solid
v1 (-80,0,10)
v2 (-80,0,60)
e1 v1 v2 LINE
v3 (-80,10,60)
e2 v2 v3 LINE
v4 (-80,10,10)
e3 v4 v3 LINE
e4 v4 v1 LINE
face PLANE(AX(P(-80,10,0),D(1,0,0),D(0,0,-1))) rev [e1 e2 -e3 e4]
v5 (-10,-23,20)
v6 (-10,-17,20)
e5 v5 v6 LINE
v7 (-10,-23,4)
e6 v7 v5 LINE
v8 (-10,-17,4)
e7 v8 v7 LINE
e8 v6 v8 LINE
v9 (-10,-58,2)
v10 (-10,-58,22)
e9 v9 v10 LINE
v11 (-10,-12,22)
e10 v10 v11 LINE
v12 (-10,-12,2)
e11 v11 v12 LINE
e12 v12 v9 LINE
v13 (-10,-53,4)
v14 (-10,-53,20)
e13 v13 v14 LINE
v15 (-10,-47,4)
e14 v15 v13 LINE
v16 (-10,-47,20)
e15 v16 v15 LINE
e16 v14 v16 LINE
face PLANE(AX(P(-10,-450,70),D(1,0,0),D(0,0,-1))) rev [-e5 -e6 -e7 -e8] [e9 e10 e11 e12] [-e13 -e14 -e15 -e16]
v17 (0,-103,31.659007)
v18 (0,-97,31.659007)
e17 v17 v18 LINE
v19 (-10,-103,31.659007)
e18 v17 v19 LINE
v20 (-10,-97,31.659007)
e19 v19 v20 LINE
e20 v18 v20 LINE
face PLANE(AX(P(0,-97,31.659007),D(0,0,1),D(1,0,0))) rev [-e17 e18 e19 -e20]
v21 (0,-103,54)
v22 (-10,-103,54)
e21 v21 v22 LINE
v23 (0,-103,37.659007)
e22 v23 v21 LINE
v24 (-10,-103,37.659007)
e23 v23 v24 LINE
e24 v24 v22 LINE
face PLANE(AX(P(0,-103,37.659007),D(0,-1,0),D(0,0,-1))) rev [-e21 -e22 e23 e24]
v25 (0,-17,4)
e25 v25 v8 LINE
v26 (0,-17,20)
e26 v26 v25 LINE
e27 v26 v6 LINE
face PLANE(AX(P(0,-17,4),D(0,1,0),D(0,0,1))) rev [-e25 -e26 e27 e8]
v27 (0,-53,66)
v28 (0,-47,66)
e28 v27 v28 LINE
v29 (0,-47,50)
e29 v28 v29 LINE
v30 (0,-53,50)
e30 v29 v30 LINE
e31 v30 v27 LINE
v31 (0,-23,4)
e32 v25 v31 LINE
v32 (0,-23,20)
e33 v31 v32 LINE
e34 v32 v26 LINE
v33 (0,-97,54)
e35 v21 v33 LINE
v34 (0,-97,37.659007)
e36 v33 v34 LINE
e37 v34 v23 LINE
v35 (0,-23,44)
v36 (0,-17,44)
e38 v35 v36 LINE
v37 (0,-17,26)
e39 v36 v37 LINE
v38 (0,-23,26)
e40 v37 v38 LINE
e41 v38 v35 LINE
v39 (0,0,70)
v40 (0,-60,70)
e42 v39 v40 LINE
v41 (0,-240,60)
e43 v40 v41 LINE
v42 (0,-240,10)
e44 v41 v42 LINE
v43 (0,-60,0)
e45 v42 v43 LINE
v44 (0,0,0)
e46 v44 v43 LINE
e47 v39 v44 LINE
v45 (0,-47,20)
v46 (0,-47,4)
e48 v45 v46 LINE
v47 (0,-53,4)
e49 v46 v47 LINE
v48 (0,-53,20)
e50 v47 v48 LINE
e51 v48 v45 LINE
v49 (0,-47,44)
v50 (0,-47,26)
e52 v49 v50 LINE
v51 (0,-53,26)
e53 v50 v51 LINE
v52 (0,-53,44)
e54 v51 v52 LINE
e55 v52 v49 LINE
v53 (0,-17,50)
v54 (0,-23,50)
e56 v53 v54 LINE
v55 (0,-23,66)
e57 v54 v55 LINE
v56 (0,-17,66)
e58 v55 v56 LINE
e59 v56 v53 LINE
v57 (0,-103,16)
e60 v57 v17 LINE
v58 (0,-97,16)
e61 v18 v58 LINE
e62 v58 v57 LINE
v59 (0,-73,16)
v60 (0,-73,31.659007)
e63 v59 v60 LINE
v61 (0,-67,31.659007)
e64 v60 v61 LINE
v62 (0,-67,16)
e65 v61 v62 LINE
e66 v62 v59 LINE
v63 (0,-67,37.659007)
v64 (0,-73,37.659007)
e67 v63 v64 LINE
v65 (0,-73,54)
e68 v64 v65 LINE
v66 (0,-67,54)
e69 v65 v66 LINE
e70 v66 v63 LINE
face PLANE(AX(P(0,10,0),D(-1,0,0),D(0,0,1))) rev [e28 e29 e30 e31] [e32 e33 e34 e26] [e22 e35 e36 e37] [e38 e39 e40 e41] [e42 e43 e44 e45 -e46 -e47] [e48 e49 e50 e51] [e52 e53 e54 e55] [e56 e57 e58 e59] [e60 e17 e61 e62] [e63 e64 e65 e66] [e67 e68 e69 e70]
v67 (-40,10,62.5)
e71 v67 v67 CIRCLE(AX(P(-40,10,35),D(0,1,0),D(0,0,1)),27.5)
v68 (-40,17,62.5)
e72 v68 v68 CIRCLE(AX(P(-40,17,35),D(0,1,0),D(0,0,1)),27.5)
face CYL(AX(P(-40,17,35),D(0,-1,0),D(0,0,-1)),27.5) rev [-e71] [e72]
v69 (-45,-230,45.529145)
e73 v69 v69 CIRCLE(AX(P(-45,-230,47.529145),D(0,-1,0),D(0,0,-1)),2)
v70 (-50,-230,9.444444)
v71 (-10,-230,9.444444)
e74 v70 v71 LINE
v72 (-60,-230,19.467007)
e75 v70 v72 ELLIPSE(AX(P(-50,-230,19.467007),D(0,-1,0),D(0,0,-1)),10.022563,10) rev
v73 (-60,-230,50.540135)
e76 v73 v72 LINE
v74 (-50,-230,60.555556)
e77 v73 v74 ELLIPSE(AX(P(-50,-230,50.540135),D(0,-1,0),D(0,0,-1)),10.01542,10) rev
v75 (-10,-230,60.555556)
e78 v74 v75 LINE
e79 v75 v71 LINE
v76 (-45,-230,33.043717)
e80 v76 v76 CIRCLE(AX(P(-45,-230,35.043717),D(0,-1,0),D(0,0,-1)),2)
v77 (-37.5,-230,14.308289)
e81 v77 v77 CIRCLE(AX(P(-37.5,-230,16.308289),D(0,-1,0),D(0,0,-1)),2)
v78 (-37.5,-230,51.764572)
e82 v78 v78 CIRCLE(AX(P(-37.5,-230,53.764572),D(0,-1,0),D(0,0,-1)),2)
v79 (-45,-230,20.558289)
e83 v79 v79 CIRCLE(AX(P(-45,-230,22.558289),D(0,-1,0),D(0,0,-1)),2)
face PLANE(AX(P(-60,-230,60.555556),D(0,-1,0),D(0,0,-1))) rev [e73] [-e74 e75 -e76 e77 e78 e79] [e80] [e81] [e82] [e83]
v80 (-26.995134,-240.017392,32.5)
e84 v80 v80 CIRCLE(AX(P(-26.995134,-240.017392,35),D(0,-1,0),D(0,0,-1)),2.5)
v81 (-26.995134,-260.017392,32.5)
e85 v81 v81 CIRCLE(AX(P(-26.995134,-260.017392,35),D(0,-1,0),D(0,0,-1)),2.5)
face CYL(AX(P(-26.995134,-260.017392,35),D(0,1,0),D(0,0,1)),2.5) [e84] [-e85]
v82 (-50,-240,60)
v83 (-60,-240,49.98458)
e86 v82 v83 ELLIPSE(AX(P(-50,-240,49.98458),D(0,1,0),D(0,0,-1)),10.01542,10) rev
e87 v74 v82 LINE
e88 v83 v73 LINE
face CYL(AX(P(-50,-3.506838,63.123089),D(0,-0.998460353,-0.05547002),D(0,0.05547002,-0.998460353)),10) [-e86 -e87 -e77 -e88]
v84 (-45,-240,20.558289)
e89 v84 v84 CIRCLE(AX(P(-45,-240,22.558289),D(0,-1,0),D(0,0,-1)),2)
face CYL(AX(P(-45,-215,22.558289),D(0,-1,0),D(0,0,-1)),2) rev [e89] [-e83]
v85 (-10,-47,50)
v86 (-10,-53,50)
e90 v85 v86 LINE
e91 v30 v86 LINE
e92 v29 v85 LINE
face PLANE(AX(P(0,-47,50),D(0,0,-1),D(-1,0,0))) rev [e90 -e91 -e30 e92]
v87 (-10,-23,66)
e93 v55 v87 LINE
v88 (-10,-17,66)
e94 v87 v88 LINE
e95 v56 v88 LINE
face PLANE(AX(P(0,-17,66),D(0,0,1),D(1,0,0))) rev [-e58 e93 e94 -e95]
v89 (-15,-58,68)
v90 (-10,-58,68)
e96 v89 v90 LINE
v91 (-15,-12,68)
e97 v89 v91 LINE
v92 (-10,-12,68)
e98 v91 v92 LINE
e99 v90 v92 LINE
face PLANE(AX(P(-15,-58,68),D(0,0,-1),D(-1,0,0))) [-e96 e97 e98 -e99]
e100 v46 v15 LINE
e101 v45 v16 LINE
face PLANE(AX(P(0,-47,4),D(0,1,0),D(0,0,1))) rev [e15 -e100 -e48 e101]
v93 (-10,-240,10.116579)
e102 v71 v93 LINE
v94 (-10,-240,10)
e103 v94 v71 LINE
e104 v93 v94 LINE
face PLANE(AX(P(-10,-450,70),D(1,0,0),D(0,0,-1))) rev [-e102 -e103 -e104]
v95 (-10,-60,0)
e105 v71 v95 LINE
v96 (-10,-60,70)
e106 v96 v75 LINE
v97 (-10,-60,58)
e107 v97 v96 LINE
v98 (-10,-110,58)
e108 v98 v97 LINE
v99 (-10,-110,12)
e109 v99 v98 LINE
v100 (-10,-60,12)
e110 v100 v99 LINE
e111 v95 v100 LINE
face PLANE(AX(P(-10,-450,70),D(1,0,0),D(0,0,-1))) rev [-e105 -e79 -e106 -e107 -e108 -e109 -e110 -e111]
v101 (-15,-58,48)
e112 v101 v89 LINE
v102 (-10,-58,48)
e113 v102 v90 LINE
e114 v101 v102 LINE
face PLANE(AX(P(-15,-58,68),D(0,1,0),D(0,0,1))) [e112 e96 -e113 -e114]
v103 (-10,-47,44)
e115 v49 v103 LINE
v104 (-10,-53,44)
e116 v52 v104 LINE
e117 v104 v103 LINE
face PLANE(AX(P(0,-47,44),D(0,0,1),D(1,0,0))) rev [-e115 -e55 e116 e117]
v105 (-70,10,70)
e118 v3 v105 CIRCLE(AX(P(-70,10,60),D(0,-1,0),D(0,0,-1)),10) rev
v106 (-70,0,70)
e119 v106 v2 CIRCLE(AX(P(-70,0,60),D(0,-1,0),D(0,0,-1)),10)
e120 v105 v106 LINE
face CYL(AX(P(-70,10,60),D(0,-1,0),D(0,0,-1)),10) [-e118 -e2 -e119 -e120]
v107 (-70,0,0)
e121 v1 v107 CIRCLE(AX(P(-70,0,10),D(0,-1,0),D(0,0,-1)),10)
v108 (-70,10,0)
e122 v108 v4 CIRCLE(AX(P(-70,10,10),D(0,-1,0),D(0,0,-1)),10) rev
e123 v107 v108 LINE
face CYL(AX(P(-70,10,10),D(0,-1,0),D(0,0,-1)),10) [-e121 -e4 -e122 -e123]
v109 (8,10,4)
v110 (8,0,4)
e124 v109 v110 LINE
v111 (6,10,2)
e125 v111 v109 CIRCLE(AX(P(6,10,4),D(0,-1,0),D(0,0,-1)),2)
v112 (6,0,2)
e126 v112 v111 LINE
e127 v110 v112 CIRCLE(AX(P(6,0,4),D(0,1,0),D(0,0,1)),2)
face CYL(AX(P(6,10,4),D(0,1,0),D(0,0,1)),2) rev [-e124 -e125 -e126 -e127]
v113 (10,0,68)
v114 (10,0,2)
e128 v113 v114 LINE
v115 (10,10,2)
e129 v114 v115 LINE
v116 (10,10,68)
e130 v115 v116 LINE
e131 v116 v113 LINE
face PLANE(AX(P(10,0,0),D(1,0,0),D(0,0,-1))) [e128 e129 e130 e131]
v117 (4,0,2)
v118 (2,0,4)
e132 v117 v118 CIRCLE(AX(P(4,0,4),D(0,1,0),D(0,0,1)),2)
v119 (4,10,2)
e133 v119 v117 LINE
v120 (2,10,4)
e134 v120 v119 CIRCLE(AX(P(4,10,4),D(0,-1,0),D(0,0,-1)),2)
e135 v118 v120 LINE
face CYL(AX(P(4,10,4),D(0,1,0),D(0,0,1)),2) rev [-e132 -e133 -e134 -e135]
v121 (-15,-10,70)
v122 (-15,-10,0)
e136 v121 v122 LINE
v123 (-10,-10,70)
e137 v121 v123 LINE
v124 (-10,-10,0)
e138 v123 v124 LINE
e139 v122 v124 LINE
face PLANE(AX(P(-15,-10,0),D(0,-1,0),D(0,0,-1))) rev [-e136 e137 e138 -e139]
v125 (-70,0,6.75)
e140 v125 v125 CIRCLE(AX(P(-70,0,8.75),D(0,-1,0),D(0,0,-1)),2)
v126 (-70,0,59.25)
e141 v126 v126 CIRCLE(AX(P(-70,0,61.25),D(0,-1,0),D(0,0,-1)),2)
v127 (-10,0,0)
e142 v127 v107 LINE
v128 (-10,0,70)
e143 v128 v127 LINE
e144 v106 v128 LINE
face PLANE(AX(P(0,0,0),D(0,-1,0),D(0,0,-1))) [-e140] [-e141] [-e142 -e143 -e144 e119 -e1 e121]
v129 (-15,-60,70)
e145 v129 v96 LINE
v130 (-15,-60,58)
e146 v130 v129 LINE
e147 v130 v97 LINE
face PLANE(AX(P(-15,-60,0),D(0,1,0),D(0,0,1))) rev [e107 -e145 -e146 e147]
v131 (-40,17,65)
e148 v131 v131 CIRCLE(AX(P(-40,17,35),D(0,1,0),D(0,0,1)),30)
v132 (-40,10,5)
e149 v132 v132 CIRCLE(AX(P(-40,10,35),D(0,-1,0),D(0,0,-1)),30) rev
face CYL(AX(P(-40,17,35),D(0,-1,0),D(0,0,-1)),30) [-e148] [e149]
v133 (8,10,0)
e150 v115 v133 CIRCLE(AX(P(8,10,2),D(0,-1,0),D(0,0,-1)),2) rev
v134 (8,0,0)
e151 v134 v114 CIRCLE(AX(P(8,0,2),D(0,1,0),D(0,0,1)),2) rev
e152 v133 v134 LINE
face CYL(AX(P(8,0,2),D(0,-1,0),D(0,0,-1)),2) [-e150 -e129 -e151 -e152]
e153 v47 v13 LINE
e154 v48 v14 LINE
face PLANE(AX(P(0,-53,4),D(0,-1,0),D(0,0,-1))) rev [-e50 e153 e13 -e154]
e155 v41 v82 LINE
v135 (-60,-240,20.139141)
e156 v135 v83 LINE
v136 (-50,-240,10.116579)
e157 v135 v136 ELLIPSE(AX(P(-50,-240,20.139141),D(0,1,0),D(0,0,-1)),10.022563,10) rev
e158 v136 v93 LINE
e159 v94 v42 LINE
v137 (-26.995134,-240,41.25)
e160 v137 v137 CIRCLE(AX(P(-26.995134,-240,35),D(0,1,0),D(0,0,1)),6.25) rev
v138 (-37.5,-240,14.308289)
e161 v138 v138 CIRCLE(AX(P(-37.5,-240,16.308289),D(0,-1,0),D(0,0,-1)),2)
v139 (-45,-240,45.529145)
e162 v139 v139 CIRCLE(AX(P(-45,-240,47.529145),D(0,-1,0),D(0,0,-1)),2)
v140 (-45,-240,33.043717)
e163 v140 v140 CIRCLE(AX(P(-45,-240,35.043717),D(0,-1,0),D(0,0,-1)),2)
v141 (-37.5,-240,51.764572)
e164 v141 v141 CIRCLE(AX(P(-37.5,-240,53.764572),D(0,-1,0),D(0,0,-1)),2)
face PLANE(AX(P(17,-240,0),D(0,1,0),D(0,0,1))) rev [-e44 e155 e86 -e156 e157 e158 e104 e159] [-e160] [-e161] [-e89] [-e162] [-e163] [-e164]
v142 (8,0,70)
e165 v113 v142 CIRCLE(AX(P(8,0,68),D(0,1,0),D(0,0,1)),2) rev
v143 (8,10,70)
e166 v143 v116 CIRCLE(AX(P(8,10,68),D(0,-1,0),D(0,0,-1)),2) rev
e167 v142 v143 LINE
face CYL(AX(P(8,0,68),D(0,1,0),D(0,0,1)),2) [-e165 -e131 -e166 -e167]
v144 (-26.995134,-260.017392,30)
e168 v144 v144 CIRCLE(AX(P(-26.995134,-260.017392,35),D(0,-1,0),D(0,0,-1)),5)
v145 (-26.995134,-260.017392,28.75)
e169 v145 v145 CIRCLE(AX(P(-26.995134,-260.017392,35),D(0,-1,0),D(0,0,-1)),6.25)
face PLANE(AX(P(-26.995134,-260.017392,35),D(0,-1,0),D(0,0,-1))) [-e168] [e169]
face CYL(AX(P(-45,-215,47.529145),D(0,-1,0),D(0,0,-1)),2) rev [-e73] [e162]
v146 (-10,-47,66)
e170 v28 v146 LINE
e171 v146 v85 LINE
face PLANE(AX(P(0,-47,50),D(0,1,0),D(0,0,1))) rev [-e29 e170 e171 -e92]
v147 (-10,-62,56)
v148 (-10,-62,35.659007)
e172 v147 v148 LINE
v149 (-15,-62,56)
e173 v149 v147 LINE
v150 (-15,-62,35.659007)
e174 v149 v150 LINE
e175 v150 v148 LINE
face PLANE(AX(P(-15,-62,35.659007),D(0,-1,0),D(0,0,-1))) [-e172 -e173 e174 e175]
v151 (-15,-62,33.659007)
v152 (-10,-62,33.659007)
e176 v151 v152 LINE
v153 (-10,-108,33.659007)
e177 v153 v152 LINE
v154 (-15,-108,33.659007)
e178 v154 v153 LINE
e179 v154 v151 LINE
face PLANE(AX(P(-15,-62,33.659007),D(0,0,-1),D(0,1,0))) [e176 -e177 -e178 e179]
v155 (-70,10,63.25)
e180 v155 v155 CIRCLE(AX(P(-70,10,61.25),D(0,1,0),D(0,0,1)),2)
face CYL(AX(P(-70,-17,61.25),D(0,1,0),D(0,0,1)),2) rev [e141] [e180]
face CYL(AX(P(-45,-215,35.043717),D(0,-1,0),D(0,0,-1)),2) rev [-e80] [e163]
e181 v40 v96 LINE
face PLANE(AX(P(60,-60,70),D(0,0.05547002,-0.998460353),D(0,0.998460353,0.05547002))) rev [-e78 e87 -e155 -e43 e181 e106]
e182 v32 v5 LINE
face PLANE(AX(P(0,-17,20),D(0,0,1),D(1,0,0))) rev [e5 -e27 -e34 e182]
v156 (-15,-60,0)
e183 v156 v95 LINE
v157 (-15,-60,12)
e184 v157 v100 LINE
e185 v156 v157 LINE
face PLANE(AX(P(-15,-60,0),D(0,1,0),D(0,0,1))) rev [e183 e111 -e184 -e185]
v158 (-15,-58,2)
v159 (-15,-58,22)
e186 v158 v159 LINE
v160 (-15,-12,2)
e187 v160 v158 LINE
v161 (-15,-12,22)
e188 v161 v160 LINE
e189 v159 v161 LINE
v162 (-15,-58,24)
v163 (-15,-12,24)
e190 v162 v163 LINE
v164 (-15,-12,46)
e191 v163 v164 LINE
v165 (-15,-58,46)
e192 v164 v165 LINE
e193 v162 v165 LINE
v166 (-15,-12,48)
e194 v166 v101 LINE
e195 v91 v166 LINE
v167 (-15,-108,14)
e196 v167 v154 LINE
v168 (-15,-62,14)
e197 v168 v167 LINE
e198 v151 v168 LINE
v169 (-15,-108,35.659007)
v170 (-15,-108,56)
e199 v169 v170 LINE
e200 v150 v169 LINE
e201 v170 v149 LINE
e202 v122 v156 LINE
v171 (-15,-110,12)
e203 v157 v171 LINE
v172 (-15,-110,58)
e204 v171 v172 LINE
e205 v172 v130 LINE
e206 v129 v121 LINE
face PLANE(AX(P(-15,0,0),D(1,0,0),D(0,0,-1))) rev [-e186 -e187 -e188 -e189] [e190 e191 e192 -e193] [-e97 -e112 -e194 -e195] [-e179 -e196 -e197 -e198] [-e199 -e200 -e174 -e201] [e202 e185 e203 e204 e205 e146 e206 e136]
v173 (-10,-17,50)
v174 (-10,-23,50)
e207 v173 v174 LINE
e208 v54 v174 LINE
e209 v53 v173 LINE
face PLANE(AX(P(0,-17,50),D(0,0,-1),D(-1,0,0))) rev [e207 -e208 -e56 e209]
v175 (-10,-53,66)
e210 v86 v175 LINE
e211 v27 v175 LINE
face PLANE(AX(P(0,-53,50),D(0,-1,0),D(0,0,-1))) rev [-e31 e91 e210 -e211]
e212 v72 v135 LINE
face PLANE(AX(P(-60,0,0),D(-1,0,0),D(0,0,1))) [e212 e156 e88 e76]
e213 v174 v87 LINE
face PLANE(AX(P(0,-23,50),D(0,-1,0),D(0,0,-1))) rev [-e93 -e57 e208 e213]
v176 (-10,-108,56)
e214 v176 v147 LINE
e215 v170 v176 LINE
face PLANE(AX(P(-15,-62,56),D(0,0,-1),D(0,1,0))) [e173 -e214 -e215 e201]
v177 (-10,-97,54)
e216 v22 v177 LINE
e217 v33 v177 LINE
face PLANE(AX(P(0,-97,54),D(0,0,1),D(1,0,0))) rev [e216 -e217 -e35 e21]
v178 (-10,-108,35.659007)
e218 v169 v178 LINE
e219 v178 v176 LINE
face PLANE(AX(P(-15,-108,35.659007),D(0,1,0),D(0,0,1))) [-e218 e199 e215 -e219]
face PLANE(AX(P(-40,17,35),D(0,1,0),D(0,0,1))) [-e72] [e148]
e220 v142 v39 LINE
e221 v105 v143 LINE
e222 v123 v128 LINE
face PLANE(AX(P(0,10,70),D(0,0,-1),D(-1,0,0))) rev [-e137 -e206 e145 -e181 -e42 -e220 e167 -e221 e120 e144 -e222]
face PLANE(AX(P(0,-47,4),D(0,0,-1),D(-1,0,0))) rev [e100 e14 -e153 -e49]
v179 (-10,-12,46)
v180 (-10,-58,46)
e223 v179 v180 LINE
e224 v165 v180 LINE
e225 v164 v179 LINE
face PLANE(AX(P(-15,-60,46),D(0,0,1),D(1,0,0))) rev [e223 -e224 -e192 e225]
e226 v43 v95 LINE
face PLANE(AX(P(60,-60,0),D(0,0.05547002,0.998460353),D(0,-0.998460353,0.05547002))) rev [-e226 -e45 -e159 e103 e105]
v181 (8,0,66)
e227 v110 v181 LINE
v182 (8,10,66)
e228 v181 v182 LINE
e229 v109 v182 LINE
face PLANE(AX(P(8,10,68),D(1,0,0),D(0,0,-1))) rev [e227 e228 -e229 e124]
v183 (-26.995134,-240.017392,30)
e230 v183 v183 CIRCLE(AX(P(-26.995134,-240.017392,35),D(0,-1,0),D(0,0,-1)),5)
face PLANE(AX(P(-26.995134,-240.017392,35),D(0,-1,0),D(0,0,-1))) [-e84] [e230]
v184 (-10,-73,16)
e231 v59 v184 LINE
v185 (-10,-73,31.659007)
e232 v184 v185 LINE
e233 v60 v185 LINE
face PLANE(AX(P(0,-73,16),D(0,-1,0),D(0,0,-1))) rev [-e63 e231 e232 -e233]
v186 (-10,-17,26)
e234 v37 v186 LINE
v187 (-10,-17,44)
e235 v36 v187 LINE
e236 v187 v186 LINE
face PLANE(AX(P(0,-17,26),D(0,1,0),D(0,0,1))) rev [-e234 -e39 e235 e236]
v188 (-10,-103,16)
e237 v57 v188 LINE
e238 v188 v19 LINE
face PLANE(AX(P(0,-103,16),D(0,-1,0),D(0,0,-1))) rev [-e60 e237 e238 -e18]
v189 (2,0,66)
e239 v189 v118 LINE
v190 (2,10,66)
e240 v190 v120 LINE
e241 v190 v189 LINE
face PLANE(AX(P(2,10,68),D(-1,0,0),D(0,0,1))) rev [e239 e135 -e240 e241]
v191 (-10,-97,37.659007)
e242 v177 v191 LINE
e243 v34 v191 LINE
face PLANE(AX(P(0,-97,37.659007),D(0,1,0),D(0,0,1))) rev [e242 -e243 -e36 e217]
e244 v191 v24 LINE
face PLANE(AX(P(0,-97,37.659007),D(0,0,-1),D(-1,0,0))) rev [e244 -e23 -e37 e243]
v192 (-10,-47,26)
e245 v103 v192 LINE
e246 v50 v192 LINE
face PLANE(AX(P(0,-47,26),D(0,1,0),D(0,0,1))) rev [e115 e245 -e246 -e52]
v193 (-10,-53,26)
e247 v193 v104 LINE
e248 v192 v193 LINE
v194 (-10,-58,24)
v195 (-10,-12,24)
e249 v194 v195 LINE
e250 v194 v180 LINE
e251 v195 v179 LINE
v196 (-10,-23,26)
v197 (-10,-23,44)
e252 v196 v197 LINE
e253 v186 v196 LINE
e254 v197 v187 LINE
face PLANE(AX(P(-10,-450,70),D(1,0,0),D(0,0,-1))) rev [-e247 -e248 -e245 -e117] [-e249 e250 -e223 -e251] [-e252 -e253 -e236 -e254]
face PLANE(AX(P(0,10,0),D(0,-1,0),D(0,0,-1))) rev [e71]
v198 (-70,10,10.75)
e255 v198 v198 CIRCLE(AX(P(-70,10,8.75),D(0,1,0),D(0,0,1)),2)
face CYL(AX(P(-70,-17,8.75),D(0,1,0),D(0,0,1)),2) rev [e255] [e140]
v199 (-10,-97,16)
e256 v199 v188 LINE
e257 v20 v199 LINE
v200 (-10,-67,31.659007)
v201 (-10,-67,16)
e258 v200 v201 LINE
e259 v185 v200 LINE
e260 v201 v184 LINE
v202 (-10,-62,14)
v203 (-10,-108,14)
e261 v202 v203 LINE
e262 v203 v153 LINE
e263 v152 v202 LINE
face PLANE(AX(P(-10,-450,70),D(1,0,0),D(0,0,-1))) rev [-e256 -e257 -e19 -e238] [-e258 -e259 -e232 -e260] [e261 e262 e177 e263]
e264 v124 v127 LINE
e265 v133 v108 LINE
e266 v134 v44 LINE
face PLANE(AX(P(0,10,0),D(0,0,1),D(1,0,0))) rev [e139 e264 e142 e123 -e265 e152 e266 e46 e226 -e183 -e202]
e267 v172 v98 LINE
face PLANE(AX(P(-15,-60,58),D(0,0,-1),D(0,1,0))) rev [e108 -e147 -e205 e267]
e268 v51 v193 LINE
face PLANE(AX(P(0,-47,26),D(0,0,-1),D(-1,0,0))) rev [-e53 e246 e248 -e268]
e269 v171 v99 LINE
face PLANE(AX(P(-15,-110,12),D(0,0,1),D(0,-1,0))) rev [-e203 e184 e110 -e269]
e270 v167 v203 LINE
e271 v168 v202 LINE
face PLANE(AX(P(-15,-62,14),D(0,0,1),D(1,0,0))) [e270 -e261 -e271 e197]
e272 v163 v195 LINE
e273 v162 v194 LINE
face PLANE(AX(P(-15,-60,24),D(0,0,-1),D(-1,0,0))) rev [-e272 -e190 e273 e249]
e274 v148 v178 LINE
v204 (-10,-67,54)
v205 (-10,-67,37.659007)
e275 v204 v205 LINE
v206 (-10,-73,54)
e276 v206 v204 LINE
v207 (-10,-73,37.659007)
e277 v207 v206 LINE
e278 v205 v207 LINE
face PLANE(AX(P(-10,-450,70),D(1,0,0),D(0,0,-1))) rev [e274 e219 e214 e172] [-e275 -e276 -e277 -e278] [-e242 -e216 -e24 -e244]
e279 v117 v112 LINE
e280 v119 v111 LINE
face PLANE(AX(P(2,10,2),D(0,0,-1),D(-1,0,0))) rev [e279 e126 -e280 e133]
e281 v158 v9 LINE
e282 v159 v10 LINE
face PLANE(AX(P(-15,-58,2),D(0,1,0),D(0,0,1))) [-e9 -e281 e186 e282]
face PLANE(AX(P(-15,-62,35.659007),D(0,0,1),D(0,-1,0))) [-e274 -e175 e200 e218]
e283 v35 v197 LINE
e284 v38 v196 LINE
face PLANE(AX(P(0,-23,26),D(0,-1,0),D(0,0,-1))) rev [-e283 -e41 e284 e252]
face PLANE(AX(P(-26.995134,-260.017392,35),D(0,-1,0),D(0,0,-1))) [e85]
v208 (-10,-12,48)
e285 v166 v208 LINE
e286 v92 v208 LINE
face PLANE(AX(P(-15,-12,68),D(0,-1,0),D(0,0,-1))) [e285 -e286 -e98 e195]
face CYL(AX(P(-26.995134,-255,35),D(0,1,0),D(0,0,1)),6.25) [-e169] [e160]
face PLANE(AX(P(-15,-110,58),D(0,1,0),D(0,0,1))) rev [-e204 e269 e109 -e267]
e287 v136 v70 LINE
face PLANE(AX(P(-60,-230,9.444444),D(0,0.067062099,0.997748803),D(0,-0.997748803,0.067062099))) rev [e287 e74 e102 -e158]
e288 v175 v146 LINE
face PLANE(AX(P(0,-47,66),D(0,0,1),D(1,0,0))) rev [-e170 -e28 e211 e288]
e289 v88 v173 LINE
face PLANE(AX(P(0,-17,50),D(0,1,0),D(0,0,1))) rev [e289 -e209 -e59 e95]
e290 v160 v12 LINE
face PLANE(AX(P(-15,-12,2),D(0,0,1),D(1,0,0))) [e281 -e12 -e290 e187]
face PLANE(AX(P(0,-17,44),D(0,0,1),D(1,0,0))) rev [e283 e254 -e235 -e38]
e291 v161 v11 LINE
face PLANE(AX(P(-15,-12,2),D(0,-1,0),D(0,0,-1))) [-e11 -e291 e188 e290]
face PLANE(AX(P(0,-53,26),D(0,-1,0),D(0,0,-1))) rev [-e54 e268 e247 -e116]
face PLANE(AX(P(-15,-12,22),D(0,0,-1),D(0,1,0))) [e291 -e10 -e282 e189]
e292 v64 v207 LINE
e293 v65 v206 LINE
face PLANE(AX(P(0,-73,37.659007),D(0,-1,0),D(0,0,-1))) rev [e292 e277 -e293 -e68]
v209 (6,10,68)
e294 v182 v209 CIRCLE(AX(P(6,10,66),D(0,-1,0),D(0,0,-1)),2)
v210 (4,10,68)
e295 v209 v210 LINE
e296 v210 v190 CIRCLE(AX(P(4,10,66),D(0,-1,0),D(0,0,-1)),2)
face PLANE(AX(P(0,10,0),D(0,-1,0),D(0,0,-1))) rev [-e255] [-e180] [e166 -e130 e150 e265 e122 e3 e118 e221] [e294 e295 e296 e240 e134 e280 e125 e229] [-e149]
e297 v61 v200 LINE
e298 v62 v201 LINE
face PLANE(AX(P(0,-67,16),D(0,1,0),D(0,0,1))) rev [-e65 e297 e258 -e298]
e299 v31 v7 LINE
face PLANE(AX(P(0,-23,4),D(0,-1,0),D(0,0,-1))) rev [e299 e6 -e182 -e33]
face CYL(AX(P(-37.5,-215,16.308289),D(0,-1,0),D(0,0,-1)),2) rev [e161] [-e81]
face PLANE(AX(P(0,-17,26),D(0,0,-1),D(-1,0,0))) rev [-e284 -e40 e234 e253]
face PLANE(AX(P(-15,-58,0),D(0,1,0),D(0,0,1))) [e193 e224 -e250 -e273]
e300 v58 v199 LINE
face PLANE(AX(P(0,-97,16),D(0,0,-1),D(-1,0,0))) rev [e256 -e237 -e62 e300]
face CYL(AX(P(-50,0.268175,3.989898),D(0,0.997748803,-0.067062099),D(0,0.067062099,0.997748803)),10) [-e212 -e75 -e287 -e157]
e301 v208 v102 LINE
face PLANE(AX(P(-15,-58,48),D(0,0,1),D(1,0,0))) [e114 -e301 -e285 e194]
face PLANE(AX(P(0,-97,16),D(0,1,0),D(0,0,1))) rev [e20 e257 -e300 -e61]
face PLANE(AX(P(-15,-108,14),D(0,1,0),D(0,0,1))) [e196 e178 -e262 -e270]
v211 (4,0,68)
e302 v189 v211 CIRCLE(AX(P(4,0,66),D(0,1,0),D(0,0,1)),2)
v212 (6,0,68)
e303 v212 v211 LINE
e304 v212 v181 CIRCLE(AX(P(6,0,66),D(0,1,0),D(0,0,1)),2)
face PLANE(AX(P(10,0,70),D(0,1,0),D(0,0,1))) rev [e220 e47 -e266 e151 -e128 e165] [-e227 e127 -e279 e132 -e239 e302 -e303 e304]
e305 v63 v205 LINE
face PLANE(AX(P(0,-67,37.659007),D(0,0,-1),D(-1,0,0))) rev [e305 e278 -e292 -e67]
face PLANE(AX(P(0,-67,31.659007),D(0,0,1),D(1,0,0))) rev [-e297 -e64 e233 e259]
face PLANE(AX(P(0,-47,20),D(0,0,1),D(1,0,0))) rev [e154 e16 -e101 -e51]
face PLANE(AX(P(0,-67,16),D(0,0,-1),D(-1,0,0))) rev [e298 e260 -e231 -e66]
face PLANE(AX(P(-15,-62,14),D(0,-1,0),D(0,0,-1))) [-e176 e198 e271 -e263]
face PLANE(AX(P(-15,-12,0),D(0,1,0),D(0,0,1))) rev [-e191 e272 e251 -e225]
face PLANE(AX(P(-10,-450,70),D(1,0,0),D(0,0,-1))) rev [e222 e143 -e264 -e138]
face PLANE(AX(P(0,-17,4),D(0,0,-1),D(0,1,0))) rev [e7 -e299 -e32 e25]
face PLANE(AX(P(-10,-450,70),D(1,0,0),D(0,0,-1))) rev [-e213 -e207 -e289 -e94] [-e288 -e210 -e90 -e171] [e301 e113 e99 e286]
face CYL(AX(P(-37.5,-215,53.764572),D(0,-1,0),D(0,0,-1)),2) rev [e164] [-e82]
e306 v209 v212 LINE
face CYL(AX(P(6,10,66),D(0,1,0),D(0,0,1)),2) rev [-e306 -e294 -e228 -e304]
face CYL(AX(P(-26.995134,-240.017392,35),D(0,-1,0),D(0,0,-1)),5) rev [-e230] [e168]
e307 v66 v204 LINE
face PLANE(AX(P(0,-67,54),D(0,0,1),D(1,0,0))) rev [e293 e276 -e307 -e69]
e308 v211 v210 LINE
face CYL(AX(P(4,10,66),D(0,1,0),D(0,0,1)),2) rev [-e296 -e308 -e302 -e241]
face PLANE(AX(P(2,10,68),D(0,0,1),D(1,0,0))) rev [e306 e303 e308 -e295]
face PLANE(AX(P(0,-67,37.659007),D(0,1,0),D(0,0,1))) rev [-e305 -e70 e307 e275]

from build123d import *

# Parameters (mm, degrees)
SKETCH1_W                 = 80
SKETCH1_H                 = 70
BOSS_EXTRUDE1_DEPTH       = 10
SKETCH2_W                 = 10
SKETCH2_H                 = 70
BOSS_EXTRUDE2_DEPTH       = 450
SKETCH3_R                 = 30
SKETCH3_R_2               = 27.5
BOSS_EXTRUDE3_DEPTH       = 7
SKETCH6_R                 = 2
CUT_EXTRUDE3_DEPTH        = 27
SKETCH7_W                 = 70
SKETCH7_H                 = 210
CUT_EXTRUDE4_DEPTH        = 27
CUT_EXTRUDE5_DEPTH        = 70
BOSS_EXTRUDE5_DEPTH       = 50
SKETCH12_R                = 10
SKETCH12_R_2              = 7.5
SKETCH12_R_3              = 2.5
BOSS_EXTRUDE6_DEPTH       = 25
SKETCH13_R                = 2
CUT_EXTRUDE6_DEPTH        = 25
SKETCH14_W                = 24
SKETCH14_H                = 50
SKETCH14_W_2              = 20
SKETCH14_H_2              = 46
BOSS_EXTRUDE7_DEPTH       = 5
SKETCH15_W                = 24
SKETCH15_H                = 50
SKETCH15_W_2              = 20
SKETCH15_H_2              = 46
BOSS_EXTRUDE8_DEPTH       = 5
SKETCH16_W                = 22
SKETCH16_H                = 2
BOSS_EXTRUDE9_DEPTH       = 5
SKETCH17_W                = 46
SKETCH17_H                = 50
SKETCH17_W_2              = 19.659007001
SKETCH17_H_2              = 46
SKETCH17_W_3              = 20.340992999
BOSS_EXTRUDE10_DEPTH      = 5
SKETCH18_W                = 16
SKETCH18_H                = 6
SKETCH18_W_2              = 18
CUT_EXTRUDE8_DEPTH        = 10
SKETCH19_W                = 15.659007001
SKETCH19_H                = 6
SKETCH19_W_2              = 16.340992999
CUT_EXTRUDE9_DEPTH        = 10
FILLET1_R                 = 10
FILLET2_R                 = 10
SKETCH20_W                = 70
SKETCH20_H                = 10
BOSS_EXTRUDE11_DEPTH      = 10
SKETCH21_W                = 6
SKETCH21_H                = 66
CUT_EXTRUDE10_DEPTH       = 10
FILLET3_R                 = 2
FILLET4_R                 = 2
FILLET5_R                 = 2
SKETCH23_W                = 25.167549862
SKETCH23_H                = 25.727851888
CUT_EXTRUDE12_DEPTH       = 116
SKETCH25_R                = 6.25
BOSS_EXTRUDE12_DEPTH      = 15
SKETCH26_W                = 12.5
SKETCH26_H                = 21
SKETCH26_H_2              = 4
BOSS_EXTRUDE13_DEPTH      = 10
SKETCH27_W                = 12.5
SKETCH27_H                = 5
BOSS_EXTRUDE15_DEPTH      = 12.5
FILLET8_R                 = 6.25
CUT_EXTRUDE14_DEPTH       = 52.5
CUT_EXTRUDE14_DEPTH_BACK  = 12.5
SKETCH29_R                = 2.5
FILLET9_R                 = 6.25
SKETCH30_W                = 23.435939186
SKETCH30_H                = 31.122826337
CUT_EXTRUDE15_DEPTH       = 78
BOSS_EXTRUDE16_DEPTH      = 8
BOSS_EXTRUDE16_DEPTH_BACK = 12
SKETCH31_R                = 6.25
SKETCH32_R                = 5
CUT_EXTRUDE16_DEPTH       = 20
SKETCH33_R                = 2.5
BOSS_EXTRUDE17_DEPTH      = 20


# Some blends are built 0.0001 mm under size
with BuildPart() as part:
    # Sketch1 → Boss-Extrude1 (new body)
    with BuildSketch(Plane(origin=(0, 0, 0), x_dir=(1, 0, 0), z_dir=(0, 1, 0))):
        with Locations((-40, -35)):
            Rectangle(SKETCH1_W, SKETCH1_H)
    extrude(amount=BOSS_EXTRUDE1_DEPTH)

    # Sketch2 → Boss-Extrude2 (add)
    with BuildSketch(Plane.XZ):
        with Locations((-5, 35)):
            Rectangle(SKETCH2_W, SKETCH2_H)
    extrude(amount=BOSS_EXTRUDE2_DEPTH)

    # Sketch3 → Boss-Extrude3 (add)
    with BuildSketch(Plane(origin=(0, 10, 0), x_dir=(1, 0, 0), z_dir=(0, 1, 0))):
        with Locations(Location((-40, -35, 0), (0, 0, 90))):
            Circle(SKETCH3_R)
        with Locations(Location((-40, -35, 0), (0, 0, 270))):
            Circle(SKETCH3_R_2, mode=Mode.SUBTRACT)
    extrude(amount=BOSS_EXTRUDE3_DEPTH)

    # Sketch6 → Cut-Extrude3 (cut)
    with BuildSketch(Plane(origin=(0, 10, 0), x_dir=(1, 0, 0), z_dir=(0, 1, 0))):
        with Locations(Location((-70, -61.25, 0), (0, 0, 270))):
            Circle(SKETCH6_R)
        with Locations(Location((-70, -8.75, 0), (0, 0, 270))):
            Circle(SKETCH6_R)
    extrude(amount=-CUT_EXTRUDE3_DEPTH, mode=Mode.SUBTRACT)

    # Sketch7 → Cut-Extrude4 (cut)
    with BuildSketch(Plane.ZY.offset(10)):
        with Locations((35, -345)):
            Rectangle(SKETCH7_W, SKETCH7_H)
    extrude(amount=-CUT_EXTRUDE4_DEPTH, mode=Mode.SUBTRACT)

    # Sketch10 → Cut-Extrude5 (cut)
    with BuildSketch(Plane.ZY.offset(10)):
        Polygon((0, -60), (10, -240), (0, -240), align=None)
        Polygon((70, -60), (60, -240), (70, -240), align=None)
    extrude(amount=-CUT_EXTRUDE5_DEPTH, mode=Mode.SUBTRACT)

    # Sketch11 → Boss-Extrude5 (add)
    with BuildSketch(Plane.ZY.offset(10)):
        Polygon((10.116578541, -240), (60, -240), (60.555555556, -230), (9.444444444, -230), align=None)
    extrude(amount=BOSS_EXTRUDE5_DEPTH)

    # Sketch12 → Boss-Extrude6 (add)
    # profile 1 of 2: a face of its own
    with BuildSketch(Plane.XZ.offset(240)):
        with Locations(Location((-30, 35, 0), (0, 0, 90))):
            Circle(SKETCH12_R)
        with Locations(Location((-30, 35, 0), (0, 0, 270))):
            Circle(SKETCH12_R_2, mode=Mode.SUBTRACT)
    # profile 2 of 2: a face of its own
    with BuildSketch(Plane.XZ.offset(240)):
        with Locations(Location((-30, 35, 0), (0, 0, 90))):
            Circle(SKETCH12_R_3)
    extrude(amount=BOSS_EXTRUDE6_DEPTH)

    # Sketch13 → Cut-Extrude6 (cut)
    with BuildSketch(Plane(origin=(0, -240, 0), x_dir=(-1, 0, 0), z_dir=(0, -1, 0))):
        with Locations(Location((45, -47.529144635, 0), (0, 0, 90))):
            Circle(SKETCH13_R)
        with Locations(Location((45, -22.558289271, 0), (0, 0, 90))):
            Circle(SKETCH13_R)
        with Locations(Location((45, -35.043716953, 0), (0, 0, 90))):
            Circle(SKETCH13_R)
        with Locations(Location((37.5, -53.764572318, 0), (0, 0, 90))):
            Circle(SKETCH13_R)
        with Locations(Location((37.5, -16.308289271, 0), (0, 0, 90))):
            Circle(SKETCH13_R)
    extrude(amount=-CUT_EXTRUDE6_DEPTH, mode=Mode.SUBTRACT)

    # Sketch14 → Boss-Extrude7 (add)
    with BuildSketch(Plane.ZY.offset(10)):
        with Locations((12, -35)):
            Rectangle(SKETCH14_W, SKETCH14_H)
        with Locations((12, -35)):
            Rectangle(SKETCH14_W_2, SKETCH14_H_2, mode=Mode.SUBTRACT)
    extrude(amount=BOSS_EXTRUDE7_DEPTH)

    # Sketch15 → Boss-Extrude8 (add)
    with BuildSketch(Plane.ZY.offset(10)):
        with Locations((58, -35)):
            Rectangle(SKETCH15_W, SKETCH15_H)
        with Locations((58, -35)):
            Rectangle(SKETCH15_W_2, SKETCH15_H_2, mode=Mode.SUBTRACT)
    extrude(amount=BOSS_EXTRUDE8_DEPTH)

    # Sketch16 → Boss-Extrude9 (add)
    with BuildSketch(Plane.ZY.offset(10)):
        with Locations((35, -11)):
            Rectangle(SKETCH16_W, SKETCH16_H)
        with Locations((35, -59)):
            Rectangle(SKETCH16_W, SKETCH16_H)
    extrude(amount=BOSS_EXTRUDE9_DEPTH)

    # Sketch17 → Boss-Extrude10 (add)
    with BuildSketch(Plane.ZY.offset(10)):
        with Locations((35, -85)):
            Rectangle(SKETCH17_W, SKETCH17_H)
        with Locations((23.8295035, -85)):
            Rectangle(SKETCH17_W_2, SKETCH17_H_2, mode=Mode.SUBTRACT)
        with Locations((45.8295035, -85)):
            Rectangle(SKETCH17_W_3, SKETCH17_H_2, mode=Mode.SUBTRACT)
    extrude(amount=BOSS_EXTRUDE10_DEPTH)

    # Sketch18 → Cut-Extrude8 (cut)
    with BuildSketch(Plane.ZY.offset(10)):
        with Locations((12, -20)):
            Rectangle(SKETCH18_W, SKETCH18_H)
        with Locations((35, -20)):
            Rectangle(SKETCH18_W_2, SKETCH18_H)
        with Locations((58, -20)):
            Rectangle(SKETCH18_W, SKETCH18_H)
        with Locations((12, -50)):
            Rectangle(SKETCH18_W, SKETCH18_H)
        with Locations((35, -50)):
            Rectangle(SKETCH18_W_2, SKETCH18_H)
        with Locations((58, -50)):
            Rectangle(SKETCH18_W, SKETCH18_H)
    extrude(amount=-CUT_EXTRUDE8_DEPTH, mode=Mode.SUBTRACT)

    # Sketch19 → Cut-Extrude9 (cut)
    with BuildSketch(Plane.ZY.offset(10)):
        with Locations((23.829503501, -70)):
            Rectangle(SKETCH19_W, SKETCH19_H)
        with Locations((23.829503501, -100)):
            Rectangle(SKETCH19_W, SKETCH19_H)
        with Locations((45.8295035, -70)):
            Rectangle(SKETCH19_W_2, SKETCH19_H)
        with Locations((45.8295035, -100)):
            Rectangle(SKETCH19_W_2, SKETCH19_H)
    extrude(amount=-CUT_EXTRUDE9_DEPTH, mode=Mode.SUBTRACT)

    # Fillet1
    fillet1_edges = [part.edges().sort_by_distance(p)[0] for p in [
        (-80, 5, 0),
        (-80, 5, 70),
    ]]
    fillet(fillet1_edges, radius=FILLET1_R)

    # Fillet2
    fillet2_edges = [part.edges().sort_by_distance(p)[0] for p in [
        (-60, -235, 9.780511493),
        (-60, -235, 60.277777778),
    ]]
    fillet(fillet2_edges, radius=FILLET2_R)

    # Sketch20 → Boss-Extrude11 (add)
    with BuildSketch(Plane(origin=(0, 0, 0), x_dir=(0, 0, -1), z_dir=(1, 0, 0))):
        with Locations((-35, 5)):
            Rectangle(SKETCH20_W, SKETCH20_H)
    extrude(amount=BOSS_EXTRUDE11_DEPTH)

    # Sketch21 → Cut-Extrude10 (cut)
    with BuildSketch(Plane.XZ):
        with Locations((5, 35)):
            Rectangle(SKETCH21_W, SKETCH21_H)
    extrude(amount=-CUT_EXTRUDE10_DEPTH, mode=Mode.SUBTRACT)

    # Fillet3
    fillet3_edges = [part.edges().sort_by_distance(p)[0] for p in [
        (10, 5, 70),
        (10, 5, 0),
    ]]
    fillet(fillet3_edges, radius=FILLET3_R)

    # Fillet4
    fillet4_edges = [part.edges().sort_by_distance(p)[0] for p in [
        (8, 5, 68),
        (8, 5, 2),
    ]]
    fillet(fillet4_edges, radius=FILLET4_R)

    # Fillet5
    fillet5_edges = [part.edges().sort_by_distance(p)[0] for p in [
        (2, 5, 2),
        (2, 5, 68),
    ]]
    fillet(fillet5_edges, radius=FILLET5_R)

    # Sketch23 → Cut-Extrude12 (cut)
    with BuildSketch(Plane.XZ.offset(240)):
        with Locations((-28.923795104, 37.128742303)):
            Rectangle(SKETCH23_W, SKETCH23_H)
    extrude(amount=CUT_EXTRUDE12_DEPTH, mode=Mode.SUBTRACT)

    # Sketch25 → Boss-Extrude12 (add)
    with BuildSketch(Plane(origin=(0, -240, 0), x_dir=(-1, 0, 0), z_dir=(0, -1, 0))):
        with Locations(Location((26.99513388, -35, 0), (0, 0, 270))):
            Circle(SKETCH25_R)
    extrude(amount=BOSS_EXTRUDE12_DEPTH)

    # Sketch26 → Boss-Extrude13 (add)
    with BuildSketch(Plane(origin=(0, -255, 0), x_dir=(-1, 0, 0), z_dir=(0, -1, 0))):
        with Locations((26.99513388, -45.5)):
            Rectangle(SKETCH26_W, SKETCH26_H)
        with Locations((26.99513388, -24.5)):
            Rectangle(SKETCH26_W, SKETCH26_H)
        with Locations((26.99513388, -12)):
            Rectangle(SKETCH26_W, SKETCH26_H_2)
        with Locations((26.99513388, -58)):
            Rectangle(SKETCH26_W, SKETCH26_H_2)
    extrude(amount=BOSS_EXTRUDE13_DEPTH)

    # Sketch27 → Boss-Extrude15 (add)
    with BuildSketch(Plane.XZ.offset(265)):
        with Locations((-26.99513388, 12.5)):
            Rectangle(SKETCH27_W, SKETCH27_H)
        with Locations((-26.99513388, 57.5)):
            Rectangle(SKETCH27_W, SKETCH27_H)
    extrude(amount=BOSS_EXTRUDE15_DEPTH)

    # Fillet8
    fillet8_edges = [part.edges().sort_by_distance(p)[0] for p in [
        (-20.74513388, -277.5, 57.5),
        (-33.24513388, -277.5, 57.5),
        (-20.74513388, -277.5, 12.5),
        (-33.24513388, -277.5, 12.5),
    ]]
    fillet(fillet8_edges, radius=FILLET8_R - 0.0001)  # a hair under: the kernel refuses the full size

    # Sketch29 → Cut-Extrude14 (cut, two sides: drawn at the far end of the back side and taken through both)
    with BuildSketch(Plane(origin=(0, 0, 55), x_dir=(-1, 0, 0), z_dir=(0, 0, -1)).offset(-CUT_EXTRUDE14_DEPTH_BACK)):
        with Locations(Location((26.99513388, -271.25, 0), (0, 0, 180))):
            Circle(SKETCH29_R)
    extrude(amount=CUT_EXTRUDE14_DEPTH + CUT_EXTRUDE14_DEPTH_BACK, mode=Mode.SUBTRACT)

    # Fillet9
    # the kernel refuses this fillet: 6.25 mm, written as the material it takes off along each edge
    with BuildSketch(Plane(origin=(-20.74513388, -255, 35), x_dir=(0, -1, 0), z_dir=(0, 0, 1))) as fillet9_piece_1_section:
        with BuildLine():
            CenterArc((FILLET9_R, -FILLET9_R), FILLET9_R, 90, 90)
            Line((0, -FILLET9_R), (0, 0))
            Line((0, 0), (FILLET9_R, 0))
        make_face()
    fillet9_piece_1 = extrude(amount=40.625, mode=Mode.PRIVATE)
    fillet9_piece_1 = fillet9_piece_1 - Plane(origin=(-26.99513388, -256.446444019, 35), x_dir=(0, 0, 1), z_dir=(0, 1, 0)) * Cylinder(6.25, 107, mode=Mode.PRIVATE)
    add(fillet9_piece_1, mode=Mode.SUBTRACT)
    with BuildSketch(Plane(origin=(-33.24513388, -255, 34.999999912), x_dir=(0, -1, 0), z_dir=(0, 0, 1))) as fillet9_piece_2_section:
        with BuildLine():
            CenterArc((FILLET9_R, FILLET9_R), FILLET9_R, 180, 90)
            Line((0, FILLET9_R), (0, 0))
            Line((0, 0), (FILLET9_R, 0))
        make_face()
    fillet9_piece_2 = extrude(amount=40.625000088, mode=Mode.PRIVATE)
    fillet9_piece_2 = fillet9_piece_2 - Plane(origin=(-26.99513388, -256.446444017, 35), x_dir=(0, 0, 1), z_dir=(0, 1, 0)) * Cylinder(6.25, 107, mode=Mode.PRIVATE)
    add(fillet9_piece_2, mode=Mode.SUBTRACT)
    with BuildSketch(Plane(origin=(-20.74513388, -255, -5.625), x_dir=(-1, 0, 0), z_dir=(0, 0, 1))) as fillet9_piece_3_section:
        with BuildLine():
            CenterArc((FILLET9_R, FILLET9_R), FILLET9_R, 180, 90)
            Line((0, FILLET9_R), (0, 0))
            Line((0, 0), (FILLET9_R, 0))
        make_face()
    fillet9_piece_3 = extrude(amount=40.625, mode=Mode.PRIVATE)
    fillet9_piece_3 = fillet9_piece_3 - Plane(origin=(-26.99513388, -256.446444019, 35), x_dir=(0, 0, 1), z_dir=(0, 1, 0)) * Cylinder(6.25, 107, mode=Mode.PRIVATE)
    add(fillet9_piece_3, mode=Mode.SUBTRACT)
    with BuildSketch(Plane(origin=(-33.24513388, -255, -5.625), x_dir=(0, -1, 0), z_dir=(0, 0, 1))) as fillet9_piece_4_section:
        with BuildLine():
            CenterArc((FILLET9_R, FILLET9_R), FILLET9_R, 180, 90)
            Line((0, FILLET9_R), (0, 0))
            Line((0, 0), (FILLET9_R, 0))
        make_face()
    fillet9_piece_4 = extrude(amount=40.624999912, mode=Mode.PRIVATE)
    fillet9_piece_4 = fillet9_piece_4 - Plane(origin=(-26.99513388, -256.446444019, 35), x_dir=(0, 0, 1), z_dir=(0, 1, 0)) * Cylinder(6.25, 107, mode=Mode.PRIVATE)
    add(fillet9_piece_4, mode=Mode.SUBTRACT)

    # Sketch30 → Cut-Extrude15 (cut)
    with BuildSketch(Plane(origin=(0, 0, 10), x_dir=(-1, 0, 0), z_dir=(0, 0, -1))):
        with Locations((26.442215429, -267.57880534)):
            Rectangle(SKETCH30_W, SKETCH30_H)
    extrude(amount=-CUT_EXTRUDE15_DEPTH, mode=Mode.SUBTRACT)

    # Sketch31 → Boss-Extrude16 (add, two sides: drawn at the far end of the back side and taken through both)
    with BuildSketch(Plane.XZ.offset(252.017392171).offset(-BOSS_EXTRUDE16_DEPTH_BACK)):
        with Locations(Location((-26.99513388, 35, 0), (0, 0, 90))):
            Circle(SKETCH31_R)
    extrude(amount=BOSS_EXTRUDE16_DEPTH + BOSS_EXTRUDE16_DEPTH_BACK)

    # Sketch32 → Cut-Extrude16 (cut)
    with BuildSketch(Plane(origin=(0, -260.017392171, 0), x_dir=(-1, 0, 0), z_dir=(0, -1, 0))):
        with Locations(Location((26.99513388, -35, 0), (0, 0, 90))):
            Circle(SKETCH32_R)
    extrude(amount=-CUT_EXTRUDE16_DEPTH, mode=Mode.SUBTRACT)

    # Sketch33 → Boss-Extrude17 (add)
    with BuildSketch(Plane.XZ.offset(240.017392171)):
        with Locations(Location((-26.99513388, 35, 0), (0, 0, 270))):
            Circle(SKETCH33_R)
    extrude(amount=BOSS_EXTRUDE17_DEPTH)


solid = part.part
